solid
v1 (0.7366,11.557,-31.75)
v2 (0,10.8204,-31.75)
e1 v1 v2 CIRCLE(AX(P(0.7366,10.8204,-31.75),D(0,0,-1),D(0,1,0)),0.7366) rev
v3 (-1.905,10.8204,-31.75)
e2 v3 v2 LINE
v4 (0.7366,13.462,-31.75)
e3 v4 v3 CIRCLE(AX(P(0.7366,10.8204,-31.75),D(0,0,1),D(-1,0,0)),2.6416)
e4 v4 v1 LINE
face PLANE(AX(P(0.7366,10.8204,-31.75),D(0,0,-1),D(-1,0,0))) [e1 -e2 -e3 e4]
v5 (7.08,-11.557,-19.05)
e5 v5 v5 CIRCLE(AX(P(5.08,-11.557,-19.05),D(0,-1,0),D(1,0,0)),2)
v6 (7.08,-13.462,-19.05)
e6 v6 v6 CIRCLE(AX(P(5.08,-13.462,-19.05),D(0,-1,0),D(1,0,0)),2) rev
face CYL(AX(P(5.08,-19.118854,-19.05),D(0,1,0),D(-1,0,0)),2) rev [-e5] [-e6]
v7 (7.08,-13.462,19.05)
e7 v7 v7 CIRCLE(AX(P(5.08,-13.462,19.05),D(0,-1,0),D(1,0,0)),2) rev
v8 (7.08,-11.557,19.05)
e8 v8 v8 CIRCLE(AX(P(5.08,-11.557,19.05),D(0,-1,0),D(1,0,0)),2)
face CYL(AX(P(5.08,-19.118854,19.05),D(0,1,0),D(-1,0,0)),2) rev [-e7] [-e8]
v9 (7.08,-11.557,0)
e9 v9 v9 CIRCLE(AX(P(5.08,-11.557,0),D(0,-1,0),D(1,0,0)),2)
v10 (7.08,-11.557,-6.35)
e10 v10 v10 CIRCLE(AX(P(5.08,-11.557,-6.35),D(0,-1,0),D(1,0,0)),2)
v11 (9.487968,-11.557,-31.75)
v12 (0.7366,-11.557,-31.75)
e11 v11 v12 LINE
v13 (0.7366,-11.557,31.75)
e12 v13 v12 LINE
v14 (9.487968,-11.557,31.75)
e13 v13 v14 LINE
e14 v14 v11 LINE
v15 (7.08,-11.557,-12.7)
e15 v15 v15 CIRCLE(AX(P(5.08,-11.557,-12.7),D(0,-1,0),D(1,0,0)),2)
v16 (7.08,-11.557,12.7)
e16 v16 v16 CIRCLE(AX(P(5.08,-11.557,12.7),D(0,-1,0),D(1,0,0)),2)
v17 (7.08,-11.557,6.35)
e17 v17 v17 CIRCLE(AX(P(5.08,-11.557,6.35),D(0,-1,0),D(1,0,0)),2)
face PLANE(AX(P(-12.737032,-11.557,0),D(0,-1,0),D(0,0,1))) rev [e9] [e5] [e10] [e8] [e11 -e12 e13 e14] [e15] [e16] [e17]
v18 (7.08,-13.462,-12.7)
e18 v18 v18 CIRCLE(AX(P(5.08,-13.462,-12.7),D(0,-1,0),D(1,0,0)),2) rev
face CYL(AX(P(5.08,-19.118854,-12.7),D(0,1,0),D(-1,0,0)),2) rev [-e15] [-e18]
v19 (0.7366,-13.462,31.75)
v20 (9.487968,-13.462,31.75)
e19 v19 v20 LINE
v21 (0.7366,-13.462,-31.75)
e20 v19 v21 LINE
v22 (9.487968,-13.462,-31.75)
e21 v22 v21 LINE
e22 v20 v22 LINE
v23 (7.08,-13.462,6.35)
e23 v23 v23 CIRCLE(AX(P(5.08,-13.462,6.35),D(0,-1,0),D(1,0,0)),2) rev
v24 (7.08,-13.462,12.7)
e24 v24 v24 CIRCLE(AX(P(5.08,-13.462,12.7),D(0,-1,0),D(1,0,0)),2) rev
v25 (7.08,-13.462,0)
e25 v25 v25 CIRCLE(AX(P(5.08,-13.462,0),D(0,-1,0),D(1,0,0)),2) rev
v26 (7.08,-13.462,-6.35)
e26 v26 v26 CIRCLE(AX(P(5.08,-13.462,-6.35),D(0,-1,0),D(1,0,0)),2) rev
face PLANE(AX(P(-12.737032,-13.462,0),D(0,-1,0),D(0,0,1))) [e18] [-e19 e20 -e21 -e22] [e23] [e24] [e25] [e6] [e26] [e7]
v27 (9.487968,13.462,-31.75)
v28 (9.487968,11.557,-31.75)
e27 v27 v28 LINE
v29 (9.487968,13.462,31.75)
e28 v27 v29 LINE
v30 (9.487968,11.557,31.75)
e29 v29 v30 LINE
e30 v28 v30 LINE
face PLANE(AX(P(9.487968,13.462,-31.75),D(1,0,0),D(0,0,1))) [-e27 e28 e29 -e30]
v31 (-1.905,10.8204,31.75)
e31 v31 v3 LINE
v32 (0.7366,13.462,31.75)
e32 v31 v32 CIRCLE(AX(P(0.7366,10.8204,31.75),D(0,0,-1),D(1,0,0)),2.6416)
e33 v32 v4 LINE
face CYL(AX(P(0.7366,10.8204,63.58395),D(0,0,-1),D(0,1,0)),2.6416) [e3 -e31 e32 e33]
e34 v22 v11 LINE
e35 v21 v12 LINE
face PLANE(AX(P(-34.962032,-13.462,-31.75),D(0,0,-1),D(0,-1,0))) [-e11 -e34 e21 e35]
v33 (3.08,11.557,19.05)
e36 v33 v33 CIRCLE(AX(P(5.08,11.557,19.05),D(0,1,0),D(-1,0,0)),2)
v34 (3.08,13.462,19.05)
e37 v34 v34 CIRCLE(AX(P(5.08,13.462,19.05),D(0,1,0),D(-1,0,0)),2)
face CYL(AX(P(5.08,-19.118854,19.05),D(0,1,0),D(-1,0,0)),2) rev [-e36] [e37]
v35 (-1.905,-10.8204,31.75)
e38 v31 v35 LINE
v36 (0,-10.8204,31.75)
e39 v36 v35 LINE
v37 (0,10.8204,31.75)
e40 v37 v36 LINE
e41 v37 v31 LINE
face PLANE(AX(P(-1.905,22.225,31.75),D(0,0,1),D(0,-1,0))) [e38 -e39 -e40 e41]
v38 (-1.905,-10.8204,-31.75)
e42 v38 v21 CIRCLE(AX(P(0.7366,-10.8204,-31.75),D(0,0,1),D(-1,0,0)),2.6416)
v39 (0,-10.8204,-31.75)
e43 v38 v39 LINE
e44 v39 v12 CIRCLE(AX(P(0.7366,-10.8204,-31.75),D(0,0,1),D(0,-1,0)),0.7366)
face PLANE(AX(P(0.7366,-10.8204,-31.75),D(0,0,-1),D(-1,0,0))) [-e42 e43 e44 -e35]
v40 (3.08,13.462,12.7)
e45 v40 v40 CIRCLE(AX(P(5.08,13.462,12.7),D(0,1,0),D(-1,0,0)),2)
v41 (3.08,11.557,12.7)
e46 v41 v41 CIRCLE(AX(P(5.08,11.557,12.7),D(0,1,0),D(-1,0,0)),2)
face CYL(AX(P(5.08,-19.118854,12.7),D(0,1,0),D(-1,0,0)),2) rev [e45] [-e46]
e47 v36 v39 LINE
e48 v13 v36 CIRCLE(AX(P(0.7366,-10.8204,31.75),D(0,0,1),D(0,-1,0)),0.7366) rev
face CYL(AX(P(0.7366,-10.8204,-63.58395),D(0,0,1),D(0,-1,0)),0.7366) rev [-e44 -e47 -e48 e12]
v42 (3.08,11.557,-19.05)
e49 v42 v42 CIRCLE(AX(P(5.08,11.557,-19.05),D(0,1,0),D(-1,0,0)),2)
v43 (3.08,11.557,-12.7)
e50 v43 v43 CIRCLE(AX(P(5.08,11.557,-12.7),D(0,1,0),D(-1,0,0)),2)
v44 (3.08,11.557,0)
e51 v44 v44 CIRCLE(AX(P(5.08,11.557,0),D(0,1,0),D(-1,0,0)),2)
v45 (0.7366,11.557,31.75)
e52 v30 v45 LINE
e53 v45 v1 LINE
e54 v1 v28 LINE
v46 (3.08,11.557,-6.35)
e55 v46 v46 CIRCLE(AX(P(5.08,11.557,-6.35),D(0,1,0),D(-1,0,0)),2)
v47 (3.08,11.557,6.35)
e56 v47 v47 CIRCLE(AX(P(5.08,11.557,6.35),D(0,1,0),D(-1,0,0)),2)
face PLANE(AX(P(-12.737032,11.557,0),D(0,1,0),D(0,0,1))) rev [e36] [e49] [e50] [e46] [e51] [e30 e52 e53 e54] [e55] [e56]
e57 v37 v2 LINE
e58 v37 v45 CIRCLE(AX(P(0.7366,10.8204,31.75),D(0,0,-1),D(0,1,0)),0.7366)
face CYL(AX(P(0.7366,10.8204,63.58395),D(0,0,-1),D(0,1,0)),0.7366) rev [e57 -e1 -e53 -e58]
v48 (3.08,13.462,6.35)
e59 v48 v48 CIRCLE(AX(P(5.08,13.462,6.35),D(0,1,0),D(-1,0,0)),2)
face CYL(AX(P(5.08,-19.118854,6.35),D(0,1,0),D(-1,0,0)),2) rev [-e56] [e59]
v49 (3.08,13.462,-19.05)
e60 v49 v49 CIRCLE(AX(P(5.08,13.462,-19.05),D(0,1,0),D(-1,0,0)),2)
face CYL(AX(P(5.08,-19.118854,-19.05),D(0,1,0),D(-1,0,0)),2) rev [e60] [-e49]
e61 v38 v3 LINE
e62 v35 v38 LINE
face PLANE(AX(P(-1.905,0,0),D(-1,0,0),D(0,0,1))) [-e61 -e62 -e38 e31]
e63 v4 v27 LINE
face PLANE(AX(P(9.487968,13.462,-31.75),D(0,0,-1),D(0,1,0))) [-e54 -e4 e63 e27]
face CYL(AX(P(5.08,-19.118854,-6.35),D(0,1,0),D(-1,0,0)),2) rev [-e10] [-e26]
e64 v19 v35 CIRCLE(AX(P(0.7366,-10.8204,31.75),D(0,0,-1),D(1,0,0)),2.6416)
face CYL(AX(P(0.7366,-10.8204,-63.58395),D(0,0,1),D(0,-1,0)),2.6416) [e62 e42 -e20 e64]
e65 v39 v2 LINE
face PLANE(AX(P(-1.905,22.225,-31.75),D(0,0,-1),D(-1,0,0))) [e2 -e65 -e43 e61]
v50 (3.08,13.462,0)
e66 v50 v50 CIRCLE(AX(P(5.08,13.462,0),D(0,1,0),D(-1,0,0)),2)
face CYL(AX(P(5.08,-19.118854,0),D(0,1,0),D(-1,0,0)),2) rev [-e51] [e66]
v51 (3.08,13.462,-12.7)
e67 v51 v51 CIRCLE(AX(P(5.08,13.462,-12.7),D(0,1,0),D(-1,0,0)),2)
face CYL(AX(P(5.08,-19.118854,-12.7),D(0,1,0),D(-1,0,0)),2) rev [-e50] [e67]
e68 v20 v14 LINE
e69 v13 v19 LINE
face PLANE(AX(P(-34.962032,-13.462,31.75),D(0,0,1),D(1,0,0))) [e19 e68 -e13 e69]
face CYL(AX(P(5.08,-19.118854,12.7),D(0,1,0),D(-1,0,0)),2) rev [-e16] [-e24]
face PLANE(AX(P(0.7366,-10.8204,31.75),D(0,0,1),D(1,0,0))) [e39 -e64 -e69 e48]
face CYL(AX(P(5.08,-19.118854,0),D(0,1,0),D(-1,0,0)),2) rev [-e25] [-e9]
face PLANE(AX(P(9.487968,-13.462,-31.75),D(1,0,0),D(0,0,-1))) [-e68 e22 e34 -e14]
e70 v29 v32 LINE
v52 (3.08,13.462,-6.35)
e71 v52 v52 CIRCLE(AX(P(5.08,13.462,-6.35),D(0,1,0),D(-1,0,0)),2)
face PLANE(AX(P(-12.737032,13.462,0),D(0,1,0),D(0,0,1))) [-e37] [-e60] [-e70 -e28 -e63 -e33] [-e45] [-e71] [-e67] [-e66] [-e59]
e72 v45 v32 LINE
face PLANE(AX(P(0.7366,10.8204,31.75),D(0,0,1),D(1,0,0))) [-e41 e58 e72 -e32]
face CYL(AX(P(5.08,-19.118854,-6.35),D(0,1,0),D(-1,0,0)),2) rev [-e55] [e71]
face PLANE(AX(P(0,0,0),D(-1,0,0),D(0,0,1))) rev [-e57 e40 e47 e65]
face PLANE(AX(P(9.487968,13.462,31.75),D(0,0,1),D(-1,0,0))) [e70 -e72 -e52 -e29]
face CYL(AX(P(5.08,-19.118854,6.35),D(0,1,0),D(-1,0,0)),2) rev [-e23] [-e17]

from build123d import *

# Parameters (mm, degrees)
SKETCH4_W              = 63.5
SKETCH4_H              = 44.45
BASE_FLANGE1_DEPTH     = 1.905
SKETCHED_START         = -31.75
SKETCHED_BEND3_DEPTH   = 63.5
SKETCHED_BEND3_2_DEPTH = 63.5
CUT_EXTRUDE2_REACH     = 44.696
SKETCH20_R             = 2


# Read off the part's stored shape, not the designer's step: Sketched Bend3
# Sheet-metal steps are written as plain solids
with BuildPart() as part:
    # Sketch4 → Base-Flange1 (new body)
    with BuildSketch(Plane(origin=(0, 0, 0), x_dir=(0, 0, -1), z_dir=(1, 0, 0))):
        Rectangle(SKETCH4_W, SKETCH4_H)
    extrude(amount=-BASE_FLANGE1_DEPTH)

    # Sketched Bend3 outline → Sketched Bend3 (cut)
    with BuildSketch(Plane.XY.offset(SKETCHED_START)):
        with BuildLine():
            ThreePointArc((0, -13.357223013), (-1.375727285, -12.406629491), (-1.905, -10.8204))
            Line((-1.905, -10.8204), (-1.905, -22.225))
            Line((-1.905, -22.225), (0, -22.225))
            Line((0, -22.225), (0, -13.357223013))
        make_face()
        with BuildLine():
            Line((-1.905, 22.225), (-1.905, 10.8204))
            ThreePointArc((-1.905, 10.8204), (-1.375727285, 12.406629491), (0, 13.357223013))
            Line((0, 13.357223013), (0, 22.225))
            Line((0, 22.225), (-1.905, 22.225))
        make_face()
    extrude(amount=SKETCHED_BEND3_DEPTH, mode=Mode.SUBTRACT)

    # Sketched Bend3 2 outline → Sketched Bend3 2 (add)
    with BuildSketch(Plane.XY.offset(SKETCHED_START)):
        with BuildLine():
            Line((0, -10.8204), (0, -13.357223013))
            ThreePointArc((0, -13.357223013), (0.364592683, -13.435674577), (0.7366, -13.462))
            Line((0.7366, -13.462), (9.487967924, -13.462))
            Line((9.487967924, -13.462), (9.487967924, -11.557))
            Line((9.487967924, -11.557), (0.7366, -11.557))
            ThreePointArc((0.7366, -11.557), (0.215745145, -11.341254855), (0, -10.8204))
        make_face()
        with BuildLine():
            ThreePointArc((0.7366, 13.462), (0.364592683, 13.435674577), (0, 13.357223013))
            Line((0, 13.357223013), (0, 10.8204))
            ThreePointArc((0, 10.8204), (0.215745145, 11.341254855), (0.7366, 11.557))
            Line((0.7366, 11.557), (9.487967924, 11.557))
            Line((9.487967924, 11.557), (9.487967924, 13.462))
            Line((9.487967924, 13.462), (0.7366, 13.462))
        make_face()
    extrude(amount=SKETCHED_BEND3_2_DEPTH)

    # Cut-Extrude2: up to this face of the body (flat: up to its plane)
    cut_extrude2_end = Plane(part.part.faces().sort_by_distance((5.112283962, -13.462, 0))[0])
    # Sketch20 → Cut-Extrude2 (cut, up to the picked face)
    with BuildSketch(Plane(origin=(0, 13.462, 0), x_dir=(1, 0, 0), z_dir=(0, 1, 0)), mode=Mode.PRIVATE) as cut_extrude2_sk1:
        with Locations(Location((5.08, 0, 0), (0, 0, 180))):
            Circle(SKETCH20_R)
    cut_extrude2_tool1 = split(extrude(cut_extrude2_sk1.sketch, amount=-CUT_EXTRUDE2_REACH, mode=Mode.PRIVATE), bisect_by=cut_extrude2_end, keep=Keep.BOTH, mode=Mode.PRIVATE)
    # Sketch20 → Cut-Extrude2 (cut, up to the picked face)
    with BuildSketch(Plane(origin=(0, 13.462, 0), x_dir=(1, 0, 0), z_dir=(0, 1, 0)), mode=Mode.PRIVATE) as cut_extrude2_sk2:
        with Locations(Location((5.08, 6.35, 0), (0, 0, 180))):
            Circle(SKETCH20_R)
    cut_extrude2_tool2 = split(extrude(cut_extrude2_sk2.sketch, amount=-CUT_EXTRUDE2_REACH, mode=Mode.PRIVATE), bisect_by=cut_extrude2_end, keep=Keep.BOTH, mode=Mode.PRIVATE)
    # Sketch20 → Cut-Extrude2 (cut, up to the picked face)
    with BuildSketch(Plane(origin=(0, 13.462, 0), x_dir=(1, 0, 0), z_dir=(0, 1, 0)), mode=Mode.PRIVATE) as cut_extrude2_sk3:
        with Locations(Location((5.08, 12.7, 0), (0, 0, 180))):
            Circle(SKETCH20_R)
    cut_extrude2_tool3 = split(extrude(cut_extrude2_sk3.sketch, amount=-CUT_EXTRUDE2_REACH, mode=Mode.PRIVATE), bisect_by=cut_extrude2_end, keep=Keep.BOTH, mode=Mode.PRIVATE)
    # Sketch20 → Cut-Extrude2 (cut, up to the picked face)
    with BuildSketch(Plane(origin=(0, 13.462, 0), x_dir=(1, 0, 0), z_dir=(0, 1, 0)), mode=Mode.PRIVATE) as cut_extrude2_sk4:
        with Locations(Location((5.08, 19.05, 0), (0, 0, 180))):
            Circle(SKETCH20_R)
    cut_extrude2_tool4 = split(extrude(cut_extrude2_sk4.sketch, amount=-CUT_EXTRUDE2_REACH, mode=Mode.PRIVATE), bisect_by=cut_extrude2_end, keep=Keep.BOTH, mode=Mode.PRIVATE)
    # Sketch20 → Cut-Extrude2 (cut, up to the picked face)
    with BuildSketch(Plane(origin=(0, 13.462, 0), x_dir=(1, 0, 0), z_dir=(0, 1, 0)), mode=Mode.PRIVATE) as cut_extrude2_sk5:
        with Locations(Location((5.08, -6.35, 0), (0, 0, 180))):
            Circle(SKETCH20_R)
    cut_extrude2_tool5 = split(extrude(cut_extrude2_sk5.sketch, amount=-CUT_EXTRUDE2_REACH, mode=Mode.PRIVATE), bisect_by=cut_extrude2_end, keep=Keep.BOTH, mode=Mode.PRIVATE)
    # Sketch20 → Cut-Extrude2 (cut, up to the picked face)
    with BuildSketch(Plane(origin=(0, 13.462, 0), x_dir=(1, 0, 0), z_dir=(0, 1, 0)), mode=Mode.PRIVATE) as cut_extrude2_sk6:
        with Locations(Location((5.08, -12.7, 0), (0, 0, 180))):
            Circle(SKETCH20_R)
    cut_extrude2_tool6 = split(extrude(cut_extrude2_sk6.sketch, amount=-CUT_EXTRUDE2_REACH, mode=Mode.PRIVATE), bisect_by=cut_extrude2_end, keep=Keep.BOTH, mode=Mode.PRIVATE)
    # Sketch20 → Cut-Extrude2 (cut, up to the picked face)
    with BuildSketch(Plane(origin=(0, 13.462, 0), x_dir=(1, 0, 0), z_dir=(0, 1, 0)), mode=Mode.PRIVATE) as cut_extrude2_sk7:
        with Locations(Location((5.08, -19.05, 0), (0, 0, 180))):
            Circle(SKETCH20_R)
    cut_extrude2_tool7 = split(extrude(cut_extrude2_sk7.sketch, amount=-CUT_EXTRUDE2_REACH, mode=Mode.PRIVATE), bisect_by=cut_extrude2_end, keep=Keep.BOTH, mode=Mode.PRIVATE)
    add(cut_extrude2_tool1.solids().sort_by(Axis((5.08, 13.462, 0), (0, -1, 0)))[0], mode=Mode.SUBTRACT)
    add(cut_extrude2_tool2.solids().sort_by(Axis((5.08, 13.462, -6.35), (0, -1, 0)))[0], mode=Mode.SUBTRACT)
    add(cut_extrude2_tool3.solids().sort_by(Axis((5.08, 13.462, -12.7), (0, -1, 0)))[0], mode=Mode.SUBTRACT)
    add(cut_extrude2_tool4.solids().sort_by(Axis((5.08, 13.462, -19.05), (0, -1, 0)))[0], mode=Mode.SUBTRACT)
    add(cut_extrude2_tool5.solids().sort_by(Axis((5.08, 13.462, 6.35), (0, -1, 0)))[0], mode=Mode.SUBTRACT)
    add(cut_extrude2_tool6.solids().sort_by(Axis((5.08, 13.462, 12.7), (0, -1, 0)))[0], mode=Mode.SUBTRACT)
    add(cut_extrude2_tool7.solids().sort_by(Axis((5.08, 13.462, 19.05), (0, -1, 0)))[0], mode=Mode.SUBTRACT)


solid = part.part
